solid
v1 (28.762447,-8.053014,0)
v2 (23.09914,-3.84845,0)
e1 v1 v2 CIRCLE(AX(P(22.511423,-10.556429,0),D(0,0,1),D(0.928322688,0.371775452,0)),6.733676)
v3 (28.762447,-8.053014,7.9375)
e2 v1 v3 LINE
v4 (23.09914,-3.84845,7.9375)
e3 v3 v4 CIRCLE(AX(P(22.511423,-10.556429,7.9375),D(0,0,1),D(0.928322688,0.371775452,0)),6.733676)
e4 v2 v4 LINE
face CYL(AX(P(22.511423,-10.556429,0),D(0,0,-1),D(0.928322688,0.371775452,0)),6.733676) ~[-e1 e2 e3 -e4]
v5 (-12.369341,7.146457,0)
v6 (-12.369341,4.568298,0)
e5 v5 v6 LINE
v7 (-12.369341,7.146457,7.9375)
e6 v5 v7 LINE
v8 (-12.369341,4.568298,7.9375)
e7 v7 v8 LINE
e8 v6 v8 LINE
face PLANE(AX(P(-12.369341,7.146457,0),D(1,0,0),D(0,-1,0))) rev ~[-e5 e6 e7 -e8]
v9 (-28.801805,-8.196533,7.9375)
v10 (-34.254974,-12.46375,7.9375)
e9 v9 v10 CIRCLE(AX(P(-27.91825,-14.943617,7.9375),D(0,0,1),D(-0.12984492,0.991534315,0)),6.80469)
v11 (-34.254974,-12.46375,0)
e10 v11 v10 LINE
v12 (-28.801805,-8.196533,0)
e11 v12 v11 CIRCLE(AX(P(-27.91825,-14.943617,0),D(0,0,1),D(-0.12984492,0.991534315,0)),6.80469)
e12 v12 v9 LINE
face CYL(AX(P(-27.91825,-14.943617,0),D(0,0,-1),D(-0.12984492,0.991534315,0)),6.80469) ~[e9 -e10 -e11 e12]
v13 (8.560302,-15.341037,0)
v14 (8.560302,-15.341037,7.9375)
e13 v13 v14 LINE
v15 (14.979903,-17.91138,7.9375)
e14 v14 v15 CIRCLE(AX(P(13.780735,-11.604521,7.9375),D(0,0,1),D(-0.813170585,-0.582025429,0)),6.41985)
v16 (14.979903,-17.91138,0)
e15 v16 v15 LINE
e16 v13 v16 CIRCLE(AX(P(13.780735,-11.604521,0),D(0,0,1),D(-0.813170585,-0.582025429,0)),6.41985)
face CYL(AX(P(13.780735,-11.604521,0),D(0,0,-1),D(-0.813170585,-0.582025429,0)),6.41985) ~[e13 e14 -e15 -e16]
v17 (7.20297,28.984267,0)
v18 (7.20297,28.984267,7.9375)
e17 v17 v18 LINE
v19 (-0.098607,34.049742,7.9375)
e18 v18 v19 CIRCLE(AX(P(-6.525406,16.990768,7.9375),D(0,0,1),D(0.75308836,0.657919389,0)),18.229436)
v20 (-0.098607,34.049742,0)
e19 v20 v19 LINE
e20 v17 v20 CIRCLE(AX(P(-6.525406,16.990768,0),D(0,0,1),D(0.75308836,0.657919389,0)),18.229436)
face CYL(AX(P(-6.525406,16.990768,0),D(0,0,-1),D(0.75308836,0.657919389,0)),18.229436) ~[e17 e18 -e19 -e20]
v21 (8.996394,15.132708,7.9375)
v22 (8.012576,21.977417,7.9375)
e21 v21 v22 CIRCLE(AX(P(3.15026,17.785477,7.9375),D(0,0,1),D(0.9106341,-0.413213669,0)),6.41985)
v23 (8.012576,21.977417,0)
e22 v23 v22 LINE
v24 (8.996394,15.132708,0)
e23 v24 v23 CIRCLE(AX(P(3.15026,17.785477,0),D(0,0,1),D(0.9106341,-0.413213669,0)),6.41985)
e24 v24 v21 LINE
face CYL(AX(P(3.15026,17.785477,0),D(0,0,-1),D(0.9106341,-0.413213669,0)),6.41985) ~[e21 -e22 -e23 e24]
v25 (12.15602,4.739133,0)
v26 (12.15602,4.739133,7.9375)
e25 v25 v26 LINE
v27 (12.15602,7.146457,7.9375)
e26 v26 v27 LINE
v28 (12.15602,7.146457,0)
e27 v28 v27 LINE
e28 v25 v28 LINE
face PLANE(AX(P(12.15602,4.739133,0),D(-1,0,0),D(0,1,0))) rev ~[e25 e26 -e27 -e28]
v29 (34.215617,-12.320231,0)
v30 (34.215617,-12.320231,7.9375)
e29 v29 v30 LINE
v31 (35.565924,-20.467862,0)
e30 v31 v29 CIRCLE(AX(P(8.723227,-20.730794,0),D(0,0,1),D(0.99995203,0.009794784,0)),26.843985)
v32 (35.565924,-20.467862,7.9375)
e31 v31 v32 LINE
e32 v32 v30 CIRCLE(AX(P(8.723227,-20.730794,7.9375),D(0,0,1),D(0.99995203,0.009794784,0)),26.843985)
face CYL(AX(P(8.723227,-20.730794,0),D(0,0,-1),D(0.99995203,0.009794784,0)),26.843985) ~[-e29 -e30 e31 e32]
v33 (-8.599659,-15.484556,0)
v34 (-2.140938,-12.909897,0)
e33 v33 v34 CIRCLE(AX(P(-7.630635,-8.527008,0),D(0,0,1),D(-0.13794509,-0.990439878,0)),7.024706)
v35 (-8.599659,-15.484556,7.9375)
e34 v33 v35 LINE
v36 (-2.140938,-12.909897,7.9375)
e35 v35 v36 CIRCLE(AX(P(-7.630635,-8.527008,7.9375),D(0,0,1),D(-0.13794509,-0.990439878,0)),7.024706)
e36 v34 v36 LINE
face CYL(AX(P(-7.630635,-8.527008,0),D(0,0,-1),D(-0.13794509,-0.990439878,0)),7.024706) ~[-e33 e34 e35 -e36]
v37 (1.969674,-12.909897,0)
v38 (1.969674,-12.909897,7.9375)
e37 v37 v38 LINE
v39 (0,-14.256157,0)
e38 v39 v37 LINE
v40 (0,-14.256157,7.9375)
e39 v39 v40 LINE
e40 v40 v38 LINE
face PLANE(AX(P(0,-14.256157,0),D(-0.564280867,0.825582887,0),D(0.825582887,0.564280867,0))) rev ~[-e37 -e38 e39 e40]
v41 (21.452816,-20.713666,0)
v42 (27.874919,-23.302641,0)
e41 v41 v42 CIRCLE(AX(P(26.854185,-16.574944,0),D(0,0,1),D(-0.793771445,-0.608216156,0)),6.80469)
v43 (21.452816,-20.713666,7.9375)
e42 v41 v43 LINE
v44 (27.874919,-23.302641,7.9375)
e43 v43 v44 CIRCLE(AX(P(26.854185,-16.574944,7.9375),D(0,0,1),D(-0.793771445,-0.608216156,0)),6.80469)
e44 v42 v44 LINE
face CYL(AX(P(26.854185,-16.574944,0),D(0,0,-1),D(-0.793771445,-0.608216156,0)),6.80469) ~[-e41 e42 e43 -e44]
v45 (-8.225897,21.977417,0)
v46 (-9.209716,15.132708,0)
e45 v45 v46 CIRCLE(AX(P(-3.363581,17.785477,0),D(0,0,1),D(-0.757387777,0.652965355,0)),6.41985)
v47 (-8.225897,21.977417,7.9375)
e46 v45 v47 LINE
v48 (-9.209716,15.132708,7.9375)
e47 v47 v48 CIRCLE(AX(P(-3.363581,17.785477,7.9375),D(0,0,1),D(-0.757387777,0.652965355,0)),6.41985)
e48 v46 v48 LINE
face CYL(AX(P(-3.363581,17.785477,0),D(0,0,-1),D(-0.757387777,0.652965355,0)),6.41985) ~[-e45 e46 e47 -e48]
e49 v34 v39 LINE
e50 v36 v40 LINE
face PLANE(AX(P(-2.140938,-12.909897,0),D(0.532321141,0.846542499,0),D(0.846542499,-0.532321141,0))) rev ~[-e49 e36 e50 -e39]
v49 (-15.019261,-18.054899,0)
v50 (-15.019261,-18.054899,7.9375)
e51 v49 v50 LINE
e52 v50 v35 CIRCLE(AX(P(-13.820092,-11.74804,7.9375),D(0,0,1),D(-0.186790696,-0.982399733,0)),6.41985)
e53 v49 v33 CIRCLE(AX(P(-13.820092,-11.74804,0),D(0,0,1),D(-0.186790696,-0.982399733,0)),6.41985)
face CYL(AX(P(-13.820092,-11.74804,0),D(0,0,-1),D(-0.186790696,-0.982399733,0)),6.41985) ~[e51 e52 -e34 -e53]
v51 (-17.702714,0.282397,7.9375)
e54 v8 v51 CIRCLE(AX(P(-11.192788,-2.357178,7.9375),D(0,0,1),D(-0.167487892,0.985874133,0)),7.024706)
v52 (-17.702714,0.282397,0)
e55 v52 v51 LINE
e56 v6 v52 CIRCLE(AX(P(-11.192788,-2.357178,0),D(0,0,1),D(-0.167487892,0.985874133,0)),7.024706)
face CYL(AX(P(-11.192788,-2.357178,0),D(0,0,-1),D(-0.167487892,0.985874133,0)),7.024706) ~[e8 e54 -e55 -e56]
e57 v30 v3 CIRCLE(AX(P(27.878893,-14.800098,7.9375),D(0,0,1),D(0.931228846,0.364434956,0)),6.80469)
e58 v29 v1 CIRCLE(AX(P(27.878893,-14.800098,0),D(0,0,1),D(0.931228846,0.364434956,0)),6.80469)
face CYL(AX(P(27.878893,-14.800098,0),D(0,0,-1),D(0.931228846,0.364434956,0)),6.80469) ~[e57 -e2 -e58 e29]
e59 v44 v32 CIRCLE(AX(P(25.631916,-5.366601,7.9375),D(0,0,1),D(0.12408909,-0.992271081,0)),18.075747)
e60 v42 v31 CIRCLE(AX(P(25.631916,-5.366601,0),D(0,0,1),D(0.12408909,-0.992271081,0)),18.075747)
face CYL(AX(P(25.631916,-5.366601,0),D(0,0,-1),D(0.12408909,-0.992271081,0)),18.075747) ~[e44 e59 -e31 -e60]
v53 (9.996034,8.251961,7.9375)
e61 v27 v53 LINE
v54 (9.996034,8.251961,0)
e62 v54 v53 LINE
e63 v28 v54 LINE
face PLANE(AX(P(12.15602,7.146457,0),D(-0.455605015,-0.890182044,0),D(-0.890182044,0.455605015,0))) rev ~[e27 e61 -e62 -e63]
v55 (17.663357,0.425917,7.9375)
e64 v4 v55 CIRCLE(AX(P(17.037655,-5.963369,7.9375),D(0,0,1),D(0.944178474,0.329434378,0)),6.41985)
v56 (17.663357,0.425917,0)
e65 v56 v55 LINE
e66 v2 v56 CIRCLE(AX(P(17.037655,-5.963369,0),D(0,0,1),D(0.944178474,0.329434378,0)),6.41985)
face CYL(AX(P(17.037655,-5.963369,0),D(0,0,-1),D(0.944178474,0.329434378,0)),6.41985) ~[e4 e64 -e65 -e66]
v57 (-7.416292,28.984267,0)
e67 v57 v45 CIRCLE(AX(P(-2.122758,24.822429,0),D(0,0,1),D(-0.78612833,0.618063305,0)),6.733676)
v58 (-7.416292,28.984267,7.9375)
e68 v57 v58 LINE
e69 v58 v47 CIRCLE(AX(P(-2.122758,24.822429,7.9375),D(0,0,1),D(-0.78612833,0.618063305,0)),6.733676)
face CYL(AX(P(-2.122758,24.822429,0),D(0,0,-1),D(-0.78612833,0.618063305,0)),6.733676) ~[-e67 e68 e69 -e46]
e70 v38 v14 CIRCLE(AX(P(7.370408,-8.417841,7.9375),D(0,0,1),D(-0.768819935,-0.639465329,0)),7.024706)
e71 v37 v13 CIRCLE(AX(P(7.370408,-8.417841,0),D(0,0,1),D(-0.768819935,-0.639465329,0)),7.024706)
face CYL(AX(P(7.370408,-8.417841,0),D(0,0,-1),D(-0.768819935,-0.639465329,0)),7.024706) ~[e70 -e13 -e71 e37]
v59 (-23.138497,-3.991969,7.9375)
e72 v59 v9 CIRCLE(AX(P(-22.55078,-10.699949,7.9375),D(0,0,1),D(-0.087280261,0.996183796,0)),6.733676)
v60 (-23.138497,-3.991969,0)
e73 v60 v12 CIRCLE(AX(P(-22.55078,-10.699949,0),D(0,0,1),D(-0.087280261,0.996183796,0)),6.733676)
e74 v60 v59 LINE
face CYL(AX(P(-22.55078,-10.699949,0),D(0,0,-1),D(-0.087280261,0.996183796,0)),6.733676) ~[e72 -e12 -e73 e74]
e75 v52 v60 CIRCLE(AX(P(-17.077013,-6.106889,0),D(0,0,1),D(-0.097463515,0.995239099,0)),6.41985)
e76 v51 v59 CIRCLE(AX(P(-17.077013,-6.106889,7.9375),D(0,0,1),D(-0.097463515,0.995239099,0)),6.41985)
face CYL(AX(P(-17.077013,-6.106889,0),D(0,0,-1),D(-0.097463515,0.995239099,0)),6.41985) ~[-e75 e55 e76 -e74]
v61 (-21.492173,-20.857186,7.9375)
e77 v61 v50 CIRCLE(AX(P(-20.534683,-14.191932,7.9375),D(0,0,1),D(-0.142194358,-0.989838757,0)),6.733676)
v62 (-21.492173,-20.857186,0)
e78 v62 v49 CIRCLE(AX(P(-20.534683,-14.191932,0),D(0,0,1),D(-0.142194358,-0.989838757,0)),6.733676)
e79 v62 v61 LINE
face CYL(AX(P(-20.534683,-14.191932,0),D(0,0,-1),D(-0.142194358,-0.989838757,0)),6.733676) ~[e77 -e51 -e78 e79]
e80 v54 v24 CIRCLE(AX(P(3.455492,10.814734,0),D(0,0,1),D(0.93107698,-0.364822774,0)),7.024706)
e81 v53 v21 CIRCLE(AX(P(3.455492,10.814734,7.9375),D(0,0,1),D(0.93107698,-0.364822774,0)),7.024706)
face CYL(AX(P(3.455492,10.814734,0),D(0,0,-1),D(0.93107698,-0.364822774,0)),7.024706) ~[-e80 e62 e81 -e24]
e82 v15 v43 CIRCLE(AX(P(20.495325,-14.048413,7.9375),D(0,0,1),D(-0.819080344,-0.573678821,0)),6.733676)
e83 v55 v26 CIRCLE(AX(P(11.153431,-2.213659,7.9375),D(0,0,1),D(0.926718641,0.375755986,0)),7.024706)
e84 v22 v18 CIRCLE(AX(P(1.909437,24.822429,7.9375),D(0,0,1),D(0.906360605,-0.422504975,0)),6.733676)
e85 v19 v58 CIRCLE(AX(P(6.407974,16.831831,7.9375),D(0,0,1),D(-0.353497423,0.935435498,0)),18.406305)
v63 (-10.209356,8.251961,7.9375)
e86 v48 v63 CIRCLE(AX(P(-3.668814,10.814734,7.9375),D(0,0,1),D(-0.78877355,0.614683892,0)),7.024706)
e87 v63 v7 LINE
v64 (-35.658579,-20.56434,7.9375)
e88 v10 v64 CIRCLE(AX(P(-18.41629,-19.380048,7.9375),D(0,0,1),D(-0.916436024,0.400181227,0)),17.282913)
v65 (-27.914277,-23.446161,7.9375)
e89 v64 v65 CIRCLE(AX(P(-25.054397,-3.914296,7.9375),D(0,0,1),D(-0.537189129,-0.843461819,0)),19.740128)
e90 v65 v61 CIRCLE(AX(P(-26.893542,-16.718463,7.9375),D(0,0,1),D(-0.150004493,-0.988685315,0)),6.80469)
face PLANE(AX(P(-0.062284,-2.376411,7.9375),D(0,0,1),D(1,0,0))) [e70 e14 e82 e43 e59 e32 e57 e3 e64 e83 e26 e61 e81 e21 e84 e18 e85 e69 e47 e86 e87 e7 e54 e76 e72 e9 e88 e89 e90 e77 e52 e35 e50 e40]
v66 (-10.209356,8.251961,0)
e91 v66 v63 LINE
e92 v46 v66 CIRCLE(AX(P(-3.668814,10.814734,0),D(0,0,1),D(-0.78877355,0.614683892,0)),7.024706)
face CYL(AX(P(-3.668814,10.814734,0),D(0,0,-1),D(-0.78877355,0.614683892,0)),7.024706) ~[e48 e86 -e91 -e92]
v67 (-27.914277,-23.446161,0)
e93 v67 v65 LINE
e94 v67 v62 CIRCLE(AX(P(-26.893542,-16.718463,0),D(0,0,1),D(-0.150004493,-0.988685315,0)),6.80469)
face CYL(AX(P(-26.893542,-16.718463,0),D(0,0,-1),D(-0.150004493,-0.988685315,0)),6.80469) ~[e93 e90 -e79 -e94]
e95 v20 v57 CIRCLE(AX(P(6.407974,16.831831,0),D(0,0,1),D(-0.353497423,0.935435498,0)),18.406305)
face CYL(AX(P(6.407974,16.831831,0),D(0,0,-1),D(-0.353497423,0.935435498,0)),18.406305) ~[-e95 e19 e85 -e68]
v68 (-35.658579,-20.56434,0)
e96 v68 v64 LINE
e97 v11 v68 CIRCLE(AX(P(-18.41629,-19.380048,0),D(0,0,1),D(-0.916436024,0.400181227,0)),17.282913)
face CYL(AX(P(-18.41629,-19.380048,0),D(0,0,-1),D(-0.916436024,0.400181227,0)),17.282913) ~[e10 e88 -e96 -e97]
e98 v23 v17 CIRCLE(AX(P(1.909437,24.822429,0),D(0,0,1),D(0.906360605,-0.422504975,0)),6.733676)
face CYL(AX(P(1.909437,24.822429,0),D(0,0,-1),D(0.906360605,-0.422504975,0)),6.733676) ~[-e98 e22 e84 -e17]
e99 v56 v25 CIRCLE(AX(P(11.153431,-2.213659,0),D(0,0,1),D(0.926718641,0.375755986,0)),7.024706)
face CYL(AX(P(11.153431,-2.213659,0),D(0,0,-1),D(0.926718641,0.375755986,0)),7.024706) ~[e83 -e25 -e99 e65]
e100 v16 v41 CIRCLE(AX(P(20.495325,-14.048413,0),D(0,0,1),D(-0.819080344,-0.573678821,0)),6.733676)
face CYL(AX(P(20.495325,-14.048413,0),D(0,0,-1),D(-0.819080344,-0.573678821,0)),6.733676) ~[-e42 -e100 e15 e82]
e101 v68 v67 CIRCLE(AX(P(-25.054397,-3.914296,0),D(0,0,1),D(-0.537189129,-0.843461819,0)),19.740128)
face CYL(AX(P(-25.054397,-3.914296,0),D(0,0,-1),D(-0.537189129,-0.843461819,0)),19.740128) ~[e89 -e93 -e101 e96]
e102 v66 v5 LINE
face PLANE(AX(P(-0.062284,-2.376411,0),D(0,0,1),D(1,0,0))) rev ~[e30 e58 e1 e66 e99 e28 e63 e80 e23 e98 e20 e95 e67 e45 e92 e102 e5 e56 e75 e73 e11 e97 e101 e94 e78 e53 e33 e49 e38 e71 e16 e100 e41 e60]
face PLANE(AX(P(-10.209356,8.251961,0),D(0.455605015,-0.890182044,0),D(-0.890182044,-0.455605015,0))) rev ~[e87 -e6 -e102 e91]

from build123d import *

# Parameters (mm, degrees)
F1_DEPTH = 7.9375


# Not quite as in the source:
# - a length typed as a fraction of an inch, garbled in the dataset ("3 / 203.2 mm" for 3/8 in), is restored


with BuildPart() as f1:
    # F0 (on Top) → F1 (new body)
    with BuildSketch(Plane.XY):
        with BuildLine():
            ThreePointArc((-0.0986067535, 34.0497419238), (-4.0682176485, 31.9659465467), (-7.4162920937, 28.9842672646))
            ThreePointArc((-7.4162920937, 28.9842672646), (-8.8119305122, 25.5953281623), (-8.2258973271, 21.977417171))
            ThreePointArc((-8.2258973271, 21.977417171), (-9.7181261566, 18.698842434), (-9.2097157612, 15.1327075437))
            ThreePointArc((-9.2097157612, 15.1327075437), (-10.6205392688, 11.8246856933), (-10.2093555033, 8.2519613206))
            Line((-10.2093555033, 8.2519613206), (-12.369341217, 7.1464567445))
            Line((-12.369341217, 7.1464567445), (-12.369341217, 4.6386048198))
            Line((-12.369341217, 4.6386048198), (-12.369341217, 4.5682978211))
            ThreePointArc((-12.369341217, 4.5682978211), (-15.5930977879, 3.1185654947), (-17.7027139134, 0.2823972963))
            ThreePointArc((-17.7027139134, 0.2823972963), (-21.0452825194, -1.0603738309), (-23.1384971151, -3.9919692741))
            ThreePointArc((-23.1384971151, -3.9919692741), (-26.5647165348, -5.2934051439), (-28.80180468, -8.19653302))
            ThreePointArc((-28.80180468, -8.19653302), (-32.1117440701, -9.5846599904), (-34.254974256, -12.4637500588))
            ThreePointArc((-34.254974256, -12.4637500588), (-35.4454588739, -16.4293701566), (-35.6585793197, -20.564340055))
            ThreePointArc((-35.6585793197, -20.564340055), (-31.9389059128, -22.4150036937), (-27.9142765499, -23.4461606411))
            ThreePointArc((-27.9142765499, -23.4461606411), (-24.3492963179, -23.0296138883), (-21.4921734029, -20.8571857766))
            ThreePointArc((-21.4921734029, -20.8571857766), (-17.8594468391, -20.3713745504), (-15.0192606046, -18.054899429))
            ThreePointArc((-15.0192606046, -18.054899429), (-11.4338171794, -17.7079201351), (-8.5996589687, -15.484556372))
            ThreePointArc((-8.5996589687, -15.484556372), (-5.0294162563, -15.0523544446), (-2.1409380715, -12.9098966718))
            Line((-2.1409380715, -12.9098966718), (0, -14.2561570176))
            Line((0, -14.2561570176), (1.9696742658, -12.9098966718))
            ThreePointArc((1.9696742658, -12.9098966718), (4.9392756736, -15.0084468105), (8.560301624, -15.3410370587))
            ThreePointArc((8.560301624, -15.3410370587), (11.3944598347, -17.5644008218), (14.9799032599, -17.9113801157))
            ThreePointArc((14.9799032599, -17.9113801157), (17.8200894944, -20.2278552371), (21.4528160582, -20.7136664634))
            ThreePointArc((21.4528160582, -20.7136664634), (24.3099389732, -22.886094575), (27.8749192052, -23.3026413279))
            ThreePointArc((27.8749192052, -23.3026413279), (31.8832272801, -22.3269581873), (35.5659238994, -20.4678624868))
            ThreePointArc((35.5659238994, -20.4678624868), (35.2059818343, -16.3418066269), (34.2156169113, -12.3202307456))
            ThreePointArc((34.2156169113, -12.3202307456), (32.0723867254, -9.4411406771), (28.7624473353, -8.0530137067))
            ThreePointArc((28.7624473353, -8.0530137067), (26.5253591901, -5.1498858306), (23.0991397704, -3.8484499608))
            ThreePointArc((23.0991397704, -3.8484499608), (21.0059251747, -0.9168545176), (17.6633565687, 0.4259166096))
            ThreePointArc((17.6633565687, 0.4259166096), (15.4847616458, 3.3168082822), (12.1560195839, 4.739132713))
            Line((12.1560195839, 4.739132713), (12.1560195839, 7.1464567445))
            Line((12.1560195839, 7.1464567445), (9.9960338703, 8.2519613206))
            ThreePointArc((9.9960338703, 8.2519613206), (10.4072176357, 11.8246856933), (8.9963941282, 15.1327075437))
            ThreePointArc((8.9963941282, 15.1327075437), (9.5048045235, 18.698842434), (8.012575694, 21.977417171))
            ThreePointArc((8.012575694, 21.977417171), (8.5986088792, 25.5953281623), (7.2029704606, 28.9842672646))
            ThreePointArc((7.2029704606, 28.9842672646), (3.8655773676, 31.9687453881), (-0.0986067535, 34.0497419238))
        make_face()
    extrude(amount=F1_DEPTH)


solid = f1.part
